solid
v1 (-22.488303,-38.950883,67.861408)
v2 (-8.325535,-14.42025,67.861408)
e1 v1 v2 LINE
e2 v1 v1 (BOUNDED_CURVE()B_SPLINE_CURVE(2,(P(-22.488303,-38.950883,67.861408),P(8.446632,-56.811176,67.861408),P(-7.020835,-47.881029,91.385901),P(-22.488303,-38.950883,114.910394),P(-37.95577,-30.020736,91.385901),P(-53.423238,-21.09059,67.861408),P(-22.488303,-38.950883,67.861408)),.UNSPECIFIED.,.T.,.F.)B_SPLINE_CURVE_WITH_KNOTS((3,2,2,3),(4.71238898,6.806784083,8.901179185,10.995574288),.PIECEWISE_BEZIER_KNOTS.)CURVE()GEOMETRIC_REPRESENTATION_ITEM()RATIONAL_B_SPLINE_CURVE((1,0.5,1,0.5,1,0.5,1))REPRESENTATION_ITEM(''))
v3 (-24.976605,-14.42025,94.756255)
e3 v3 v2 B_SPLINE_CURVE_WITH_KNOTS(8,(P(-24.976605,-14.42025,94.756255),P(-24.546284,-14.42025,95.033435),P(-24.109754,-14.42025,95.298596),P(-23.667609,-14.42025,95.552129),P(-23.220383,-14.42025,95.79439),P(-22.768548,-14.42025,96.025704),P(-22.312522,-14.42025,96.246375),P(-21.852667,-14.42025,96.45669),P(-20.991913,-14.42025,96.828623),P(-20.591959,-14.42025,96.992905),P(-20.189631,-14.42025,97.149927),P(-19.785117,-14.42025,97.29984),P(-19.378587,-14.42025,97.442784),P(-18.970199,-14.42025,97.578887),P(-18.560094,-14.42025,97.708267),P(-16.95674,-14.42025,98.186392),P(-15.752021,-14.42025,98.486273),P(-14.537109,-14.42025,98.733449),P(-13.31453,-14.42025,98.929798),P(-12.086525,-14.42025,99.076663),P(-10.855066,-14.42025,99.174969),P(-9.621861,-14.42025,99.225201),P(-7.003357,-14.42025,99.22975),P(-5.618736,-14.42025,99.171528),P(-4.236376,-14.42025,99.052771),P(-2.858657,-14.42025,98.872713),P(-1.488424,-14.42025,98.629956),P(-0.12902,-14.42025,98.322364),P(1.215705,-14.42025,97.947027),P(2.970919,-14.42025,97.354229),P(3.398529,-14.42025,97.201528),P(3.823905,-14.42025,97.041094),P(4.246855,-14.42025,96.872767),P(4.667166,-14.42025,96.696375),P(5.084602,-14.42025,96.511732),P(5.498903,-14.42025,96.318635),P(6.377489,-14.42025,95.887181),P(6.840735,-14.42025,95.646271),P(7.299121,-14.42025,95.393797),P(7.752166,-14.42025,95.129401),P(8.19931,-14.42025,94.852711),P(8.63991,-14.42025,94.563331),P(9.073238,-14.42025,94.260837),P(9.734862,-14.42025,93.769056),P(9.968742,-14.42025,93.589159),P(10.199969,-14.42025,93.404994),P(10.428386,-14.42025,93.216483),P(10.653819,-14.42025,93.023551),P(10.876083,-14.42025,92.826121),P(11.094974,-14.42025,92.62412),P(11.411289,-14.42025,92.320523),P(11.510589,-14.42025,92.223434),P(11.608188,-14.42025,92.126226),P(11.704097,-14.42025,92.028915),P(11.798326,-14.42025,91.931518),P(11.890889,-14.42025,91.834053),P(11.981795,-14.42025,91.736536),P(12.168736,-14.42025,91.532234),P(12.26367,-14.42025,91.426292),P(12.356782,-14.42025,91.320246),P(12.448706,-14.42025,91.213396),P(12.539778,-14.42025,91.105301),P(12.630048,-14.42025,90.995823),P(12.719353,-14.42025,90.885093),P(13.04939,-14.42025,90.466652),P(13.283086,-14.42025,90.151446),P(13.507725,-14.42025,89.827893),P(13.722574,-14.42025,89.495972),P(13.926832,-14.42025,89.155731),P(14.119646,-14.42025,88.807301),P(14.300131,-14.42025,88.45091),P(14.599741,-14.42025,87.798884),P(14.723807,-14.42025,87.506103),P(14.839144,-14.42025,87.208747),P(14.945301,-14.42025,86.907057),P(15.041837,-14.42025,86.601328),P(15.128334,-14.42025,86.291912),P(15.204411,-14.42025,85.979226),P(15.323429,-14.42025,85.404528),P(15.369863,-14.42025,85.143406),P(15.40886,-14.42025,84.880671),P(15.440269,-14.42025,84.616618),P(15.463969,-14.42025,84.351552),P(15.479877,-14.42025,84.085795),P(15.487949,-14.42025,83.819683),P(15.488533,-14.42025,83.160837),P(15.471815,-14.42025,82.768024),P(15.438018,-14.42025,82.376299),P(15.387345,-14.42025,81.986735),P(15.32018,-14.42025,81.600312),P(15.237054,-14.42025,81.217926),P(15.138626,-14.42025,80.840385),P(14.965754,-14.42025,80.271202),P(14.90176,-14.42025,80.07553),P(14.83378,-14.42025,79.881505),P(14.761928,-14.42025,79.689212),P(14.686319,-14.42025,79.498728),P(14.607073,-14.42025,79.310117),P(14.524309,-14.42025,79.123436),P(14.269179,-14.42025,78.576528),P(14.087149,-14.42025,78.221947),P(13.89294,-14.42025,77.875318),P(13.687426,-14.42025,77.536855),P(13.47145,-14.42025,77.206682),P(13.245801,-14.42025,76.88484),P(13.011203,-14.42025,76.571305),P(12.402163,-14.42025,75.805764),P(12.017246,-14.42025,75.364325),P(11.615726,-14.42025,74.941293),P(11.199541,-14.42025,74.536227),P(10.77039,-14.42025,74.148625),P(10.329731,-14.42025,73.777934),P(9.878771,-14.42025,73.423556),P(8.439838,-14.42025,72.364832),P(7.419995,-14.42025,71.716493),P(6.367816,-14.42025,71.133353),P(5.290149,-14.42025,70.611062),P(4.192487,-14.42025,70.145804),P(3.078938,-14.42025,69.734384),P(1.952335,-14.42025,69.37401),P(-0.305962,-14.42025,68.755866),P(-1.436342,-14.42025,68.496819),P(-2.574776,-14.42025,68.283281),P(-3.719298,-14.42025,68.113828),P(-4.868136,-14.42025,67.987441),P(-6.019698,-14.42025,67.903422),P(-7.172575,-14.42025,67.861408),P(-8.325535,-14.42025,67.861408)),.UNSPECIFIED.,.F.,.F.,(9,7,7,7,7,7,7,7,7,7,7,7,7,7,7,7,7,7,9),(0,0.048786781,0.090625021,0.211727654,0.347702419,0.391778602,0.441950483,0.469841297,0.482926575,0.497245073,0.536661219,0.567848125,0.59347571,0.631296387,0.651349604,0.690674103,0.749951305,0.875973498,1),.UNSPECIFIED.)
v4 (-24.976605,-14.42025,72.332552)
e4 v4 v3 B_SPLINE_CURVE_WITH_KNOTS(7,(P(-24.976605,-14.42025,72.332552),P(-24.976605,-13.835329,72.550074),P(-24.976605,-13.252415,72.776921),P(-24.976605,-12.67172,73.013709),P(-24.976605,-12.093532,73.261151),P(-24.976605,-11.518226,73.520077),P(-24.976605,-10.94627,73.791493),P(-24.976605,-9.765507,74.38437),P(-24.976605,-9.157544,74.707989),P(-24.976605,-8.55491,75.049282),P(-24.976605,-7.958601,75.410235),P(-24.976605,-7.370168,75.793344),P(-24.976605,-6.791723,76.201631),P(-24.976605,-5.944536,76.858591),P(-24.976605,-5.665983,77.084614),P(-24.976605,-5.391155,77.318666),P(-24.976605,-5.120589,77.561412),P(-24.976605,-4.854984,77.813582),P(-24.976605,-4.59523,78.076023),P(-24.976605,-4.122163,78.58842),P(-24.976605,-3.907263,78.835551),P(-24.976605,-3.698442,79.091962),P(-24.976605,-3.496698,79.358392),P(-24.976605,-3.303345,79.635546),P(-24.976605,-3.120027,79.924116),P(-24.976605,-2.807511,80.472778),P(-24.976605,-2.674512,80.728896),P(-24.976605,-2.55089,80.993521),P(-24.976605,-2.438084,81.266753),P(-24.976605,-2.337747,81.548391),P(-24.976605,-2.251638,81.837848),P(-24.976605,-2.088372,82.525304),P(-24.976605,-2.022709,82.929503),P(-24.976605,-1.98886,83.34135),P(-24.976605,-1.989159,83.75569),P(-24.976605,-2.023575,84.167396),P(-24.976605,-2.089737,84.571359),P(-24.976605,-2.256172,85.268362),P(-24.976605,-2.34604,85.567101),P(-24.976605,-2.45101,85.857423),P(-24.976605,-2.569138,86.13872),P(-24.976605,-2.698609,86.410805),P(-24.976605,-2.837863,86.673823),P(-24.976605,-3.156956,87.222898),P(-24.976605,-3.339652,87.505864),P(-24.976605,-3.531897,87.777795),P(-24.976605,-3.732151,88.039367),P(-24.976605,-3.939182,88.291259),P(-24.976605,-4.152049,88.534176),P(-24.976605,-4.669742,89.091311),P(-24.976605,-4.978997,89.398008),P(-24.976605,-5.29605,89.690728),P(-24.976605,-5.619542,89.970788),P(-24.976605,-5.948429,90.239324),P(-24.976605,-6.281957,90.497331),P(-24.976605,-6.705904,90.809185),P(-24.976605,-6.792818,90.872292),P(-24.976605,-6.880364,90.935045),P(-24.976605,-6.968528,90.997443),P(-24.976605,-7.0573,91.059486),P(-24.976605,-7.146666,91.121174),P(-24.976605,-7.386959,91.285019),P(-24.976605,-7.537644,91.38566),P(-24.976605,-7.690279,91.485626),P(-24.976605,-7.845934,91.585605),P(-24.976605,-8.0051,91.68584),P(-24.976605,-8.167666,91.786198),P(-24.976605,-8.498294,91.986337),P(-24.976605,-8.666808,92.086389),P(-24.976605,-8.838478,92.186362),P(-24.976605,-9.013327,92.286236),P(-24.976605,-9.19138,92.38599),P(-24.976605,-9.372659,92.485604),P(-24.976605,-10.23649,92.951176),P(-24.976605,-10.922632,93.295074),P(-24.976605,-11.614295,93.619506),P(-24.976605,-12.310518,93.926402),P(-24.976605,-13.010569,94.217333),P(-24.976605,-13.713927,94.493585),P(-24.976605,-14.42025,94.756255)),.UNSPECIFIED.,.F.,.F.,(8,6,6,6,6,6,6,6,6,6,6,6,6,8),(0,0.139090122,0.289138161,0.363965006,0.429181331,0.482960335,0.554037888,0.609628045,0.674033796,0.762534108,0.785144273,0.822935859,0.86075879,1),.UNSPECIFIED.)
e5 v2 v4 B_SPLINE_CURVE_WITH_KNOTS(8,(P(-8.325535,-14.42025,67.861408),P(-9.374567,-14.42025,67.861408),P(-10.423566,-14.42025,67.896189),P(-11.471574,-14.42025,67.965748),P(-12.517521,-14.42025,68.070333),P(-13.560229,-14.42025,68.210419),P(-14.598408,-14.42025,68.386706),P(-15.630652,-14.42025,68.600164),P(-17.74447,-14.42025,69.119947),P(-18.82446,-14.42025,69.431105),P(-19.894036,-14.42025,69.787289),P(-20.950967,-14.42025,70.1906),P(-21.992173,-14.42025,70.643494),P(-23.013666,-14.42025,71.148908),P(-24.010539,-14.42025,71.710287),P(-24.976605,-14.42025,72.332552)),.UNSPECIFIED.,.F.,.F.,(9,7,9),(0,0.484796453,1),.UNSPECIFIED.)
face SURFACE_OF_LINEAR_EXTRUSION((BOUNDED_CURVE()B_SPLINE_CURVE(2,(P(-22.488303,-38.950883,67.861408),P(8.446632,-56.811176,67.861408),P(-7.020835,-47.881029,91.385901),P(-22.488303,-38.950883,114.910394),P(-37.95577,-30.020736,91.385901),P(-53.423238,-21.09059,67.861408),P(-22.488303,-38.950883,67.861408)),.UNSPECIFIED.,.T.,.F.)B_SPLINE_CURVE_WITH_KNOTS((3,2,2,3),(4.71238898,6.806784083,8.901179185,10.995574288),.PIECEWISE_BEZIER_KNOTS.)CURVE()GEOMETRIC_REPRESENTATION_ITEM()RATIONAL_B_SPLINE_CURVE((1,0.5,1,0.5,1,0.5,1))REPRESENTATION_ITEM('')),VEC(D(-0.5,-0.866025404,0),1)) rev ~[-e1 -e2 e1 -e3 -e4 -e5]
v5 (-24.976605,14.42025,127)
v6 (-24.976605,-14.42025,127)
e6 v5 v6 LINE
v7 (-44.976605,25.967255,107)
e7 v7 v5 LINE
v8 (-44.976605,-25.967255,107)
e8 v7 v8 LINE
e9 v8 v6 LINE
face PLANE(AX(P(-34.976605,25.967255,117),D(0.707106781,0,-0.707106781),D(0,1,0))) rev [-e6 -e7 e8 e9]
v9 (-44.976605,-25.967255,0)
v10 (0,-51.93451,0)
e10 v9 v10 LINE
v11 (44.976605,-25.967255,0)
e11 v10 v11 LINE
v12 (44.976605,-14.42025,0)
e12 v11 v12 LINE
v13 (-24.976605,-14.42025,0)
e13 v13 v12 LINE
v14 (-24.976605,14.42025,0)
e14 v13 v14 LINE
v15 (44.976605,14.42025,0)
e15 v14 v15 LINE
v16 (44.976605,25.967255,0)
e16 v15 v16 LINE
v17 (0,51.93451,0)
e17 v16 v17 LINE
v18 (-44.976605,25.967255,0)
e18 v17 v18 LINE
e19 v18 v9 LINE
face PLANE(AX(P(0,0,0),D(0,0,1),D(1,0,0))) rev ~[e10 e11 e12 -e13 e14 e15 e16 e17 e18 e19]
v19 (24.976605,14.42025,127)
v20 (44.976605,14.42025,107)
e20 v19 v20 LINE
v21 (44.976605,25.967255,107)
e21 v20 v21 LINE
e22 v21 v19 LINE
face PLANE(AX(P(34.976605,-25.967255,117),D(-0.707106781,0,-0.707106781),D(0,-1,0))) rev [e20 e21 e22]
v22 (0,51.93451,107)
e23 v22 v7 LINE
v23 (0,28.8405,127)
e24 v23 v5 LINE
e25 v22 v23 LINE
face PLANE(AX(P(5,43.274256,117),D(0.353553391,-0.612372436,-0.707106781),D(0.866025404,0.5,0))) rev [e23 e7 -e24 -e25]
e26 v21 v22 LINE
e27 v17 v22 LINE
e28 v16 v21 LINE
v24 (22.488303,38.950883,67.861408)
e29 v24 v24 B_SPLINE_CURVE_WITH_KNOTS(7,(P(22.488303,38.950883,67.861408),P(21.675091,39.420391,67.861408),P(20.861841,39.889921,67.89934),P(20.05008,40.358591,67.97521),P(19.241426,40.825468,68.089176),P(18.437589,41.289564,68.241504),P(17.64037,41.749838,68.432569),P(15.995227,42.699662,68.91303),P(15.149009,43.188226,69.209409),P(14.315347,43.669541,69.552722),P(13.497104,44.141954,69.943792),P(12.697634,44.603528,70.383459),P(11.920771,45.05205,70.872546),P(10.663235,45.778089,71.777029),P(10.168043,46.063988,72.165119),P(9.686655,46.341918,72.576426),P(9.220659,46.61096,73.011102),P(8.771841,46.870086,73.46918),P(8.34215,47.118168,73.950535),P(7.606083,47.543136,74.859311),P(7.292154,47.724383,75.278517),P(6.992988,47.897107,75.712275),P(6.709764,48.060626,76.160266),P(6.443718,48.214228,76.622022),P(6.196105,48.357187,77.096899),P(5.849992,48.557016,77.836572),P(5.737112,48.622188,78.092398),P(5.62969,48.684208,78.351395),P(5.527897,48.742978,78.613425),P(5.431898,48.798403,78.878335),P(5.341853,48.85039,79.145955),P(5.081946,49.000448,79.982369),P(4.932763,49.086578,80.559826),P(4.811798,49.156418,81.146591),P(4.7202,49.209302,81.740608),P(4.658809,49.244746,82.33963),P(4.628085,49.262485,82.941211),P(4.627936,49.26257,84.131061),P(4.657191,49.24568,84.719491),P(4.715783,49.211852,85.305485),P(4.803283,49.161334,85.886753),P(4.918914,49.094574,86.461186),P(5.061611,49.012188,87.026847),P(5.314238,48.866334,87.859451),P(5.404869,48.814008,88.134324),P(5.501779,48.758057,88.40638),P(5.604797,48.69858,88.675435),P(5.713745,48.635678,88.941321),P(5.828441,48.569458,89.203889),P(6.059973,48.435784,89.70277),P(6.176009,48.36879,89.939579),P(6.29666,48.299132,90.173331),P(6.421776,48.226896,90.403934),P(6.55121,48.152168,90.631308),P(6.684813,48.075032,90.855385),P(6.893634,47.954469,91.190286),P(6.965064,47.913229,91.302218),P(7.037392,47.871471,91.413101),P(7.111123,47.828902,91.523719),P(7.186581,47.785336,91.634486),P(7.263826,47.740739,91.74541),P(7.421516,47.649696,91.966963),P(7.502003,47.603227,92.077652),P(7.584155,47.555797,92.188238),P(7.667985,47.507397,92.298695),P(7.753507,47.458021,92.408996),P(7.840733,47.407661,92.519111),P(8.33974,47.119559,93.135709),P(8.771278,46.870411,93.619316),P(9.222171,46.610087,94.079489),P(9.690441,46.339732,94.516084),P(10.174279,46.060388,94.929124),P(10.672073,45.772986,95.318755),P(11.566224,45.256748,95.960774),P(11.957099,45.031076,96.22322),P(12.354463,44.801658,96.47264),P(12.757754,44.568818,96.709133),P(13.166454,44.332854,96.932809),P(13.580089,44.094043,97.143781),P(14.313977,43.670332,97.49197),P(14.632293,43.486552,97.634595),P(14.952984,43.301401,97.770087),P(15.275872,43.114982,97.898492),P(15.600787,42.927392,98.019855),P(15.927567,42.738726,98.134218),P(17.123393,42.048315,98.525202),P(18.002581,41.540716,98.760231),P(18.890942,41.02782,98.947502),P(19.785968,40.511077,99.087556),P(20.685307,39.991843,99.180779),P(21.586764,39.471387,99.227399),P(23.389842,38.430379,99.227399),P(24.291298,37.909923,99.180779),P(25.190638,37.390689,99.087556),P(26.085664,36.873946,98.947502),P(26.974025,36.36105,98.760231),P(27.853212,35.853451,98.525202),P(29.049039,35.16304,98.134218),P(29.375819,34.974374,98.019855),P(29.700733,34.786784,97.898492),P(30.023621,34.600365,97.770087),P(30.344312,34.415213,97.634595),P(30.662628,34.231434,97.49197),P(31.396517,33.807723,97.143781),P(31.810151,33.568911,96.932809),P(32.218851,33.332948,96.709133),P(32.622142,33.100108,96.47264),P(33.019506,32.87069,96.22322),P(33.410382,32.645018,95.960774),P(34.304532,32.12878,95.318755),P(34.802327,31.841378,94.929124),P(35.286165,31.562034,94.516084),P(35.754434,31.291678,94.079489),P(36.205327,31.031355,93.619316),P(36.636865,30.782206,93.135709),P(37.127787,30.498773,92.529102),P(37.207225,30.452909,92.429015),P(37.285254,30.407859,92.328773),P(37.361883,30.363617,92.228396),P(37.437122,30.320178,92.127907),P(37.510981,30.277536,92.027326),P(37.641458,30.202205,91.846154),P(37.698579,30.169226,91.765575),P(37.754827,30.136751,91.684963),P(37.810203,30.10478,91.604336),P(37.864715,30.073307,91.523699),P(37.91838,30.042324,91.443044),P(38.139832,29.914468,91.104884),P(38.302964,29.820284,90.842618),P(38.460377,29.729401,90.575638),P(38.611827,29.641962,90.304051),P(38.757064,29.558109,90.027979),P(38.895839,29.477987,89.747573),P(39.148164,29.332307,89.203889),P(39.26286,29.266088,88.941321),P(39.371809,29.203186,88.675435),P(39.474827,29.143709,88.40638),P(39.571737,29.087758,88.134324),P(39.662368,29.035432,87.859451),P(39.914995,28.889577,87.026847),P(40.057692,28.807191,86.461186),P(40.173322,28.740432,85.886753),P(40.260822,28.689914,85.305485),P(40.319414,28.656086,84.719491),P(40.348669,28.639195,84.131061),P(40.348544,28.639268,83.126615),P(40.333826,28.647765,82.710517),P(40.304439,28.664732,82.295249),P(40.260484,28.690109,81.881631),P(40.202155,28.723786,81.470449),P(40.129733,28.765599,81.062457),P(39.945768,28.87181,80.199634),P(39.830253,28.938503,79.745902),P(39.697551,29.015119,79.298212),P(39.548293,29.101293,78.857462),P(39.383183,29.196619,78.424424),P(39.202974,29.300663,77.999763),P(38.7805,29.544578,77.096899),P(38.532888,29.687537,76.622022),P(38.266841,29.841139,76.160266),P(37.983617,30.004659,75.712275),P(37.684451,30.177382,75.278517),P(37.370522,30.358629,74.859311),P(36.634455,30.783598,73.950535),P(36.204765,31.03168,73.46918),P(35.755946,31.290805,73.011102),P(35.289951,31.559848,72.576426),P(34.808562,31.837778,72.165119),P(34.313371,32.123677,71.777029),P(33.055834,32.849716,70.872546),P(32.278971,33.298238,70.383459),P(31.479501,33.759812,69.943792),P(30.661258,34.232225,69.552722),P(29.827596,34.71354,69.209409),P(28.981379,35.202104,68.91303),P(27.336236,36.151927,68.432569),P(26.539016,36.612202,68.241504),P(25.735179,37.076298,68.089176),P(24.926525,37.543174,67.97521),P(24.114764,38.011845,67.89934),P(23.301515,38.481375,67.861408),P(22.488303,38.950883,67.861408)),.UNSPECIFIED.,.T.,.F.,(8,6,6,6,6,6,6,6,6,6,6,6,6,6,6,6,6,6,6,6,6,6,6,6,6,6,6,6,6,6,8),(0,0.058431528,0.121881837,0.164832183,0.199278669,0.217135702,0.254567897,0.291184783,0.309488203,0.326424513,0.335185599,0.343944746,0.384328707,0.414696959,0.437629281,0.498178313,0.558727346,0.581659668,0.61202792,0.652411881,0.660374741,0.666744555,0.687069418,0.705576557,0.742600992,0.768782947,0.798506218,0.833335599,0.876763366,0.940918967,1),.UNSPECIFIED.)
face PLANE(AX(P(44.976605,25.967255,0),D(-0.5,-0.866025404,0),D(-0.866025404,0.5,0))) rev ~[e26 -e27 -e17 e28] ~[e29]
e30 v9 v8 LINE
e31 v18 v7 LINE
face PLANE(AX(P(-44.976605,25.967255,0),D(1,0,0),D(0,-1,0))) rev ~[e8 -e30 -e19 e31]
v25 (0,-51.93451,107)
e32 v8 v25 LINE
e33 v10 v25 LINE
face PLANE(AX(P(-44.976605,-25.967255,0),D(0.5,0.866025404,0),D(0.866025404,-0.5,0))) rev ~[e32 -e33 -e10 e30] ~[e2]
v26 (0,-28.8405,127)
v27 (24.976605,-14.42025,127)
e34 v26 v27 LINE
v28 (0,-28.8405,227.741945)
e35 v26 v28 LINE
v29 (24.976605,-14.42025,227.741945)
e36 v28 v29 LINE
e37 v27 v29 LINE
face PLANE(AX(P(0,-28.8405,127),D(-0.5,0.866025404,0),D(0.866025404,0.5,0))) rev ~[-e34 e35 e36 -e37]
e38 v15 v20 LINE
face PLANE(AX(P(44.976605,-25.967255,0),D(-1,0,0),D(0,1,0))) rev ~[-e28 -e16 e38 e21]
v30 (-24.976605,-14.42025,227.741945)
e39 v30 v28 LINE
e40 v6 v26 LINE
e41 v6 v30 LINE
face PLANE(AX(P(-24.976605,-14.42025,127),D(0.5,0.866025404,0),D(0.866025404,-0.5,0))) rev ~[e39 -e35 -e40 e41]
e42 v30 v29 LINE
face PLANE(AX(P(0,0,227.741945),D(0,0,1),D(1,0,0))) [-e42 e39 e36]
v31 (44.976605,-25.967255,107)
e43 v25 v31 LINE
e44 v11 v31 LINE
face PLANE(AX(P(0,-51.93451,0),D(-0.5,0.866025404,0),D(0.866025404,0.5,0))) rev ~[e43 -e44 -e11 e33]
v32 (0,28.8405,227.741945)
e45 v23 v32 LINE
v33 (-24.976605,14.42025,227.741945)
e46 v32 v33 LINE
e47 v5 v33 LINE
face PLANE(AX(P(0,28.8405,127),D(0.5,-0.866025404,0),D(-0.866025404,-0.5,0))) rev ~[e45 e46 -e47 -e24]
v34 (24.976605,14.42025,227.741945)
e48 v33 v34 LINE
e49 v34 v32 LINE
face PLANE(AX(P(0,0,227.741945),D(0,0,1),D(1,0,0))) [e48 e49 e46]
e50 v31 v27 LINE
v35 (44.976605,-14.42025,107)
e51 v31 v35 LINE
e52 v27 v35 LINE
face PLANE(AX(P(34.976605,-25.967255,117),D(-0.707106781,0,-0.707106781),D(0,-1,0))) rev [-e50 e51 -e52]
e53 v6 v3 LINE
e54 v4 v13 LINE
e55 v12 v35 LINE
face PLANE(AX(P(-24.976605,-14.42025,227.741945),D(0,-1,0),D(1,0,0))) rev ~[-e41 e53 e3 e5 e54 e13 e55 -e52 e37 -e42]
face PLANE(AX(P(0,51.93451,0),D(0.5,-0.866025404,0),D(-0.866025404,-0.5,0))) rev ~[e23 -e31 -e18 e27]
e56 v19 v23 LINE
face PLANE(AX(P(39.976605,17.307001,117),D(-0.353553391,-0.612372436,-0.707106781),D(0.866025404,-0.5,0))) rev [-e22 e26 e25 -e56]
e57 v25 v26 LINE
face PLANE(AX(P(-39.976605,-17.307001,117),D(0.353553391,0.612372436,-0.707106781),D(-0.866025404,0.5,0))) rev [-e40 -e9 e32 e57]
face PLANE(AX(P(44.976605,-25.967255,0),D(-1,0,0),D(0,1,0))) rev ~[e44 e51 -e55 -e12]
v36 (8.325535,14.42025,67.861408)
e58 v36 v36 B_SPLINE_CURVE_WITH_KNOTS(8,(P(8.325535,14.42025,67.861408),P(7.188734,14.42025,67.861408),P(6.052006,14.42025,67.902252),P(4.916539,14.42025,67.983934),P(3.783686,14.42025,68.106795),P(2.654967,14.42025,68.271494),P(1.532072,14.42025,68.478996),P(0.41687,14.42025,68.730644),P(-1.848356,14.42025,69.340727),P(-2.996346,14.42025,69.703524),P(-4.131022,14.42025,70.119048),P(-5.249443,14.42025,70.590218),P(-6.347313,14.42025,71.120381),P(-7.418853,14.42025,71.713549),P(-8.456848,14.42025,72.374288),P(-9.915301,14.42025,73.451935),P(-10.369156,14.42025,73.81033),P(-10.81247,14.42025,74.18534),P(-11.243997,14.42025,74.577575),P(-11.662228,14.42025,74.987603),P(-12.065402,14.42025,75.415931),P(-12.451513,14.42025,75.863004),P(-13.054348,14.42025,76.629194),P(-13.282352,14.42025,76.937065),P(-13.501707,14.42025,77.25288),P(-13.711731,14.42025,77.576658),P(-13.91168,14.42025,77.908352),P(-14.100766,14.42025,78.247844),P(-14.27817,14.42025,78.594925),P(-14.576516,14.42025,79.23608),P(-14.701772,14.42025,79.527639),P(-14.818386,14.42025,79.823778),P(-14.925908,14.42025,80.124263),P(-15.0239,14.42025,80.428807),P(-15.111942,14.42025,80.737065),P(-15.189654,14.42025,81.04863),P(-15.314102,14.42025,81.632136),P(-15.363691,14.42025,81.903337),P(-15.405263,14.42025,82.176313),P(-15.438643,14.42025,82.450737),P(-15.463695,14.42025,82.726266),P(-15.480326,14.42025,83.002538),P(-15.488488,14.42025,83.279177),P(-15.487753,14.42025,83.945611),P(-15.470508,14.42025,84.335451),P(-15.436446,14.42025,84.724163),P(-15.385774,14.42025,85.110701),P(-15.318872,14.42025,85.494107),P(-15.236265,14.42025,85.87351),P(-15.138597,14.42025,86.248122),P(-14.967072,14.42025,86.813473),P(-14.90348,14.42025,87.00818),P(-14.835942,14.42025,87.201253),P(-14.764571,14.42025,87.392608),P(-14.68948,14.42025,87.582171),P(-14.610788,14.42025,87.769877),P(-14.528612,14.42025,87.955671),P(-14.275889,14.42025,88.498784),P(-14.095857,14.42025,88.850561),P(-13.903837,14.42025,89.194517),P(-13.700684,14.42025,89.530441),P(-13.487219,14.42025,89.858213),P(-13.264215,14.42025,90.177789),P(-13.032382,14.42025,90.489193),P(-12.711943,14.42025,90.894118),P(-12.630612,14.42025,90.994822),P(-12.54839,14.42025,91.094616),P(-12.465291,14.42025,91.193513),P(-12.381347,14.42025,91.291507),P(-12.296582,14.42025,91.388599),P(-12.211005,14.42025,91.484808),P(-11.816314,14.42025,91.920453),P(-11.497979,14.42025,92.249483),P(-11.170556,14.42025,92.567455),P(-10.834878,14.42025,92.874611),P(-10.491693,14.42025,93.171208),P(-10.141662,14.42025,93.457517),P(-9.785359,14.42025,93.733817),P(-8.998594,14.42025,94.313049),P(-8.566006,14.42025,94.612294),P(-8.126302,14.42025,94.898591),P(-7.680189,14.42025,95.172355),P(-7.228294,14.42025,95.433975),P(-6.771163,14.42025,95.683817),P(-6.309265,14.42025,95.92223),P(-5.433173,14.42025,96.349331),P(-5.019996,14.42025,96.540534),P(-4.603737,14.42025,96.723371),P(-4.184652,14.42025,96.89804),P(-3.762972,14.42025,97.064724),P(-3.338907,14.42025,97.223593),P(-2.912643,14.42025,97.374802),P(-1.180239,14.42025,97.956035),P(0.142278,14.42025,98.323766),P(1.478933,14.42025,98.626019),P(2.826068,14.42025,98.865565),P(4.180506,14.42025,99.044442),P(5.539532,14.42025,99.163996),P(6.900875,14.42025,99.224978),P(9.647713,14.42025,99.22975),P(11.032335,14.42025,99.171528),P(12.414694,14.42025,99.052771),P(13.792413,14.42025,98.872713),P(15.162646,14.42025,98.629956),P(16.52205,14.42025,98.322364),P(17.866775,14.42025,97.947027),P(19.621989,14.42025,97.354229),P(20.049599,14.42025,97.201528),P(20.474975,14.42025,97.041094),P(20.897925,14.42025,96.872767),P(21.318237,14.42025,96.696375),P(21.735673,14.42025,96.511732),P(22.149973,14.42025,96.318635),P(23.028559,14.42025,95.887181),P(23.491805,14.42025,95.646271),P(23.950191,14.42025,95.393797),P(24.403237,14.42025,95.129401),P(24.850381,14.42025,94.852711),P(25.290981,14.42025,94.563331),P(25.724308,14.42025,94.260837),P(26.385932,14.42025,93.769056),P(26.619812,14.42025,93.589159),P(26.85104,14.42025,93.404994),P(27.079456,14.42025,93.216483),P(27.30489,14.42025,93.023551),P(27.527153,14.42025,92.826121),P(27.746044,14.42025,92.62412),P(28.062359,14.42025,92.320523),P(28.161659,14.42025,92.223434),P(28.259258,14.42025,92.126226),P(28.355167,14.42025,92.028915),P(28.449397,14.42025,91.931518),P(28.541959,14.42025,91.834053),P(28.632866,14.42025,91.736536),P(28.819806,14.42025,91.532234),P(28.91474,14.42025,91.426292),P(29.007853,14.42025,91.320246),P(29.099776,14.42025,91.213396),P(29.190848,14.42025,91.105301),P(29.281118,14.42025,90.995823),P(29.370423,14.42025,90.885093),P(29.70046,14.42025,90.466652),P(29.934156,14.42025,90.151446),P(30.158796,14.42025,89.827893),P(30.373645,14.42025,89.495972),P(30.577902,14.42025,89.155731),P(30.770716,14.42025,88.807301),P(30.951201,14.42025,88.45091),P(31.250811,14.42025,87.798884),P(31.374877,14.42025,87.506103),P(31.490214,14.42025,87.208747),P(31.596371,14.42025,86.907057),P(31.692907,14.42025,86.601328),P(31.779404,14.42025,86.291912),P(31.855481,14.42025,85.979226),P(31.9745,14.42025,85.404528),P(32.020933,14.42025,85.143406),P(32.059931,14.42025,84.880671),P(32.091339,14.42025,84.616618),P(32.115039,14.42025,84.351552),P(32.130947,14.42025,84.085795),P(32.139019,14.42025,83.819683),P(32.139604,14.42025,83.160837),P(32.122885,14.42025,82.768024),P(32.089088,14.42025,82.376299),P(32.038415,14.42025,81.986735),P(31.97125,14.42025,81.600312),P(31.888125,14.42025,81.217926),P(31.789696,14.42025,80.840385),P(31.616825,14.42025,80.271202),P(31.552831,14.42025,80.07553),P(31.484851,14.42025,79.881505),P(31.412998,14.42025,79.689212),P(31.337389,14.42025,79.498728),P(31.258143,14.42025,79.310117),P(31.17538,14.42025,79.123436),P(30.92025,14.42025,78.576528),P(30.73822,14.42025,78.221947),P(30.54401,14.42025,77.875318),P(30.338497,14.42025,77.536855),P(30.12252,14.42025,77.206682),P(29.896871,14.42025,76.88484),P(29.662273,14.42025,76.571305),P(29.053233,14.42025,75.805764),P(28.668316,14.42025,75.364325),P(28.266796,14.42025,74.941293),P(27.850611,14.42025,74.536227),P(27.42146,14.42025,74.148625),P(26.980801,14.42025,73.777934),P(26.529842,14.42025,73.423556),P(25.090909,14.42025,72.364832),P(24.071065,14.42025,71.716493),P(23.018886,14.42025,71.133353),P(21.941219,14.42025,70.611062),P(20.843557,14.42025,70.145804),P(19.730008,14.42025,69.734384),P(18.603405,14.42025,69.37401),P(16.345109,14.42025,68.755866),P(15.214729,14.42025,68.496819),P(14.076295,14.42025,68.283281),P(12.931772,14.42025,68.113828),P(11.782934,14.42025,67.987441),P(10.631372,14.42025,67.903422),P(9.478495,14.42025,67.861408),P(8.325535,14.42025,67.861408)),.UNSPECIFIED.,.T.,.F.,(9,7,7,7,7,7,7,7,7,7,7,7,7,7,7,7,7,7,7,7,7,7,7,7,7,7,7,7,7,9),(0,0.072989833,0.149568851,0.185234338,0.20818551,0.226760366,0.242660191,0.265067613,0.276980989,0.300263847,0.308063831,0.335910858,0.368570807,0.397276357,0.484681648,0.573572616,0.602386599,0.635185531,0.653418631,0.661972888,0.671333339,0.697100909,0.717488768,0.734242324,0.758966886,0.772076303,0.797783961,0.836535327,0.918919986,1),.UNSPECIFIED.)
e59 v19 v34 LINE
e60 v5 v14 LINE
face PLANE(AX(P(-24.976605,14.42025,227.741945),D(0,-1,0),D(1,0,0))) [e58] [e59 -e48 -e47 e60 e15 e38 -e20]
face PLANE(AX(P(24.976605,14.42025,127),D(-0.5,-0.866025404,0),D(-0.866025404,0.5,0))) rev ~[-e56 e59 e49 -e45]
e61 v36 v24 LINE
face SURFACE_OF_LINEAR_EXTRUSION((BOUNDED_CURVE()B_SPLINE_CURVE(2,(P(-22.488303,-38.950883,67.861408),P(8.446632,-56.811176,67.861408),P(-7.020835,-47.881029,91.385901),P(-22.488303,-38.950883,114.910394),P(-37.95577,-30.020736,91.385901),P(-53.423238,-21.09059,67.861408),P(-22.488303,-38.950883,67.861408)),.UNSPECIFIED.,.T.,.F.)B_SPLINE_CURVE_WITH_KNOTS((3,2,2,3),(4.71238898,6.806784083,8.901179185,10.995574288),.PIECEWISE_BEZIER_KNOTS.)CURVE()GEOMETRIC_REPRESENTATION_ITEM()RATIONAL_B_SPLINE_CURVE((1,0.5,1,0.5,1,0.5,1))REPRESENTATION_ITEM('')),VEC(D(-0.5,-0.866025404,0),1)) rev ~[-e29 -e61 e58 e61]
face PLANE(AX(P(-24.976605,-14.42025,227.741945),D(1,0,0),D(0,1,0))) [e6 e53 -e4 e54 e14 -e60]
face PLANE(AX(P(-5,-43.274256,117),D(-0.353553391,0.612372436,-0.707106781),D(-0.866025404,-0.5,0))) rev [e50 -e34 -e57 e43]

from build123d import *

# Parameters (mm, degrees)
F1_DEPTH  = 127
F2_SIZE   = 20
F3_DEPTH  = 100.7419452071
F4_W      = 73.9247704289
F4_H      = 28.8404997019
F5_DEPTH  = 227.7429452071
F10_DEPTH = 112.4425134991


# Not quite as in the source:
# - the program builds the solid bodies; features that only make, move or delete a surface that nothing else refers to are left out


with BuildPart() as f1:
    # F0 (on Top) → F1 (new body)
    with BuildSketch(Plane.XY):
        Polygon((-44.9766053996, -25.9672552347), (0, -51.9345104694), (44.9766053996, -25.9672552347), (44.9766053996, 25.9672552347), (0, 51.9345104694), (-44.9766053996, 25.9672552347), align=None)
    extrude(amount=F1_DEPTH)

    # F2
    f2_edges = [f1.edges().sort_by_distance(p)[0] for p in [
        (-44.976605, 0, 127),
        (-22.488303, 38.950883, 127),
        (22.488303, 38.950883, 127),
        (44.976605, 0, 127),
        (22.488303, -38.950883, 127),
        (-22.488303, -38.950883, 127),
    ]]
    chamfer(f2_edges, length=F2_SIZE)

    # F3 (add): a face of the model
    f3_faces = [f1.faces().sort_by_distance(p)[0] for p in [
        (0, 0, 127),
    ]]
    extrude(f3_faces, amount=F3_DEPTH)

    # F4 (on face) → F5 (cut, through all)
    with BuildSketch(Plane.XY.offset(227.7419452071)):
        with Locations((11.9857798148, 0)):
            Rectangle(F4_W, F4_H)
    extrude(amount=-F5_DEPTH, mode=Mode.SUBTRACT)

    # F8 (on face) → F10 (cut, through all)
    with BuildSketch(Plane(origin=(-22.4883026998, -38.9508828521, 0), x_dir=(0.8660254038, -0.5, 0), z_dir=(-0.5, -0.8660254038, 0))):
        with BuildLine():
            add(Edge.make_bspline(
                [(0, 67.8614079952), (35.7205863144, 67.8614079952), (17.8602931572, 91.3859009743), (0, 114.9103939533), (-17.8602931572, 91.3859009743), (-35.7205863144, 67.8614079952), (0, 67.8614079952)],
                knots=[4.7123889804, 4.7123889804, 4.7123889804, 6.8067840828, 6.8067840828, 8.9011791852, 8.9011791852, 10.9955742876, 10.9955742876, 10.9955742876], degree=2, weights=[1, 0.5, 1, 0.5, 1, 0.5, 1]))
        make_face()
    extrude(amount=-F10_DEPTH, mode=Mode.SUBTRACT)


solid = f1.part
